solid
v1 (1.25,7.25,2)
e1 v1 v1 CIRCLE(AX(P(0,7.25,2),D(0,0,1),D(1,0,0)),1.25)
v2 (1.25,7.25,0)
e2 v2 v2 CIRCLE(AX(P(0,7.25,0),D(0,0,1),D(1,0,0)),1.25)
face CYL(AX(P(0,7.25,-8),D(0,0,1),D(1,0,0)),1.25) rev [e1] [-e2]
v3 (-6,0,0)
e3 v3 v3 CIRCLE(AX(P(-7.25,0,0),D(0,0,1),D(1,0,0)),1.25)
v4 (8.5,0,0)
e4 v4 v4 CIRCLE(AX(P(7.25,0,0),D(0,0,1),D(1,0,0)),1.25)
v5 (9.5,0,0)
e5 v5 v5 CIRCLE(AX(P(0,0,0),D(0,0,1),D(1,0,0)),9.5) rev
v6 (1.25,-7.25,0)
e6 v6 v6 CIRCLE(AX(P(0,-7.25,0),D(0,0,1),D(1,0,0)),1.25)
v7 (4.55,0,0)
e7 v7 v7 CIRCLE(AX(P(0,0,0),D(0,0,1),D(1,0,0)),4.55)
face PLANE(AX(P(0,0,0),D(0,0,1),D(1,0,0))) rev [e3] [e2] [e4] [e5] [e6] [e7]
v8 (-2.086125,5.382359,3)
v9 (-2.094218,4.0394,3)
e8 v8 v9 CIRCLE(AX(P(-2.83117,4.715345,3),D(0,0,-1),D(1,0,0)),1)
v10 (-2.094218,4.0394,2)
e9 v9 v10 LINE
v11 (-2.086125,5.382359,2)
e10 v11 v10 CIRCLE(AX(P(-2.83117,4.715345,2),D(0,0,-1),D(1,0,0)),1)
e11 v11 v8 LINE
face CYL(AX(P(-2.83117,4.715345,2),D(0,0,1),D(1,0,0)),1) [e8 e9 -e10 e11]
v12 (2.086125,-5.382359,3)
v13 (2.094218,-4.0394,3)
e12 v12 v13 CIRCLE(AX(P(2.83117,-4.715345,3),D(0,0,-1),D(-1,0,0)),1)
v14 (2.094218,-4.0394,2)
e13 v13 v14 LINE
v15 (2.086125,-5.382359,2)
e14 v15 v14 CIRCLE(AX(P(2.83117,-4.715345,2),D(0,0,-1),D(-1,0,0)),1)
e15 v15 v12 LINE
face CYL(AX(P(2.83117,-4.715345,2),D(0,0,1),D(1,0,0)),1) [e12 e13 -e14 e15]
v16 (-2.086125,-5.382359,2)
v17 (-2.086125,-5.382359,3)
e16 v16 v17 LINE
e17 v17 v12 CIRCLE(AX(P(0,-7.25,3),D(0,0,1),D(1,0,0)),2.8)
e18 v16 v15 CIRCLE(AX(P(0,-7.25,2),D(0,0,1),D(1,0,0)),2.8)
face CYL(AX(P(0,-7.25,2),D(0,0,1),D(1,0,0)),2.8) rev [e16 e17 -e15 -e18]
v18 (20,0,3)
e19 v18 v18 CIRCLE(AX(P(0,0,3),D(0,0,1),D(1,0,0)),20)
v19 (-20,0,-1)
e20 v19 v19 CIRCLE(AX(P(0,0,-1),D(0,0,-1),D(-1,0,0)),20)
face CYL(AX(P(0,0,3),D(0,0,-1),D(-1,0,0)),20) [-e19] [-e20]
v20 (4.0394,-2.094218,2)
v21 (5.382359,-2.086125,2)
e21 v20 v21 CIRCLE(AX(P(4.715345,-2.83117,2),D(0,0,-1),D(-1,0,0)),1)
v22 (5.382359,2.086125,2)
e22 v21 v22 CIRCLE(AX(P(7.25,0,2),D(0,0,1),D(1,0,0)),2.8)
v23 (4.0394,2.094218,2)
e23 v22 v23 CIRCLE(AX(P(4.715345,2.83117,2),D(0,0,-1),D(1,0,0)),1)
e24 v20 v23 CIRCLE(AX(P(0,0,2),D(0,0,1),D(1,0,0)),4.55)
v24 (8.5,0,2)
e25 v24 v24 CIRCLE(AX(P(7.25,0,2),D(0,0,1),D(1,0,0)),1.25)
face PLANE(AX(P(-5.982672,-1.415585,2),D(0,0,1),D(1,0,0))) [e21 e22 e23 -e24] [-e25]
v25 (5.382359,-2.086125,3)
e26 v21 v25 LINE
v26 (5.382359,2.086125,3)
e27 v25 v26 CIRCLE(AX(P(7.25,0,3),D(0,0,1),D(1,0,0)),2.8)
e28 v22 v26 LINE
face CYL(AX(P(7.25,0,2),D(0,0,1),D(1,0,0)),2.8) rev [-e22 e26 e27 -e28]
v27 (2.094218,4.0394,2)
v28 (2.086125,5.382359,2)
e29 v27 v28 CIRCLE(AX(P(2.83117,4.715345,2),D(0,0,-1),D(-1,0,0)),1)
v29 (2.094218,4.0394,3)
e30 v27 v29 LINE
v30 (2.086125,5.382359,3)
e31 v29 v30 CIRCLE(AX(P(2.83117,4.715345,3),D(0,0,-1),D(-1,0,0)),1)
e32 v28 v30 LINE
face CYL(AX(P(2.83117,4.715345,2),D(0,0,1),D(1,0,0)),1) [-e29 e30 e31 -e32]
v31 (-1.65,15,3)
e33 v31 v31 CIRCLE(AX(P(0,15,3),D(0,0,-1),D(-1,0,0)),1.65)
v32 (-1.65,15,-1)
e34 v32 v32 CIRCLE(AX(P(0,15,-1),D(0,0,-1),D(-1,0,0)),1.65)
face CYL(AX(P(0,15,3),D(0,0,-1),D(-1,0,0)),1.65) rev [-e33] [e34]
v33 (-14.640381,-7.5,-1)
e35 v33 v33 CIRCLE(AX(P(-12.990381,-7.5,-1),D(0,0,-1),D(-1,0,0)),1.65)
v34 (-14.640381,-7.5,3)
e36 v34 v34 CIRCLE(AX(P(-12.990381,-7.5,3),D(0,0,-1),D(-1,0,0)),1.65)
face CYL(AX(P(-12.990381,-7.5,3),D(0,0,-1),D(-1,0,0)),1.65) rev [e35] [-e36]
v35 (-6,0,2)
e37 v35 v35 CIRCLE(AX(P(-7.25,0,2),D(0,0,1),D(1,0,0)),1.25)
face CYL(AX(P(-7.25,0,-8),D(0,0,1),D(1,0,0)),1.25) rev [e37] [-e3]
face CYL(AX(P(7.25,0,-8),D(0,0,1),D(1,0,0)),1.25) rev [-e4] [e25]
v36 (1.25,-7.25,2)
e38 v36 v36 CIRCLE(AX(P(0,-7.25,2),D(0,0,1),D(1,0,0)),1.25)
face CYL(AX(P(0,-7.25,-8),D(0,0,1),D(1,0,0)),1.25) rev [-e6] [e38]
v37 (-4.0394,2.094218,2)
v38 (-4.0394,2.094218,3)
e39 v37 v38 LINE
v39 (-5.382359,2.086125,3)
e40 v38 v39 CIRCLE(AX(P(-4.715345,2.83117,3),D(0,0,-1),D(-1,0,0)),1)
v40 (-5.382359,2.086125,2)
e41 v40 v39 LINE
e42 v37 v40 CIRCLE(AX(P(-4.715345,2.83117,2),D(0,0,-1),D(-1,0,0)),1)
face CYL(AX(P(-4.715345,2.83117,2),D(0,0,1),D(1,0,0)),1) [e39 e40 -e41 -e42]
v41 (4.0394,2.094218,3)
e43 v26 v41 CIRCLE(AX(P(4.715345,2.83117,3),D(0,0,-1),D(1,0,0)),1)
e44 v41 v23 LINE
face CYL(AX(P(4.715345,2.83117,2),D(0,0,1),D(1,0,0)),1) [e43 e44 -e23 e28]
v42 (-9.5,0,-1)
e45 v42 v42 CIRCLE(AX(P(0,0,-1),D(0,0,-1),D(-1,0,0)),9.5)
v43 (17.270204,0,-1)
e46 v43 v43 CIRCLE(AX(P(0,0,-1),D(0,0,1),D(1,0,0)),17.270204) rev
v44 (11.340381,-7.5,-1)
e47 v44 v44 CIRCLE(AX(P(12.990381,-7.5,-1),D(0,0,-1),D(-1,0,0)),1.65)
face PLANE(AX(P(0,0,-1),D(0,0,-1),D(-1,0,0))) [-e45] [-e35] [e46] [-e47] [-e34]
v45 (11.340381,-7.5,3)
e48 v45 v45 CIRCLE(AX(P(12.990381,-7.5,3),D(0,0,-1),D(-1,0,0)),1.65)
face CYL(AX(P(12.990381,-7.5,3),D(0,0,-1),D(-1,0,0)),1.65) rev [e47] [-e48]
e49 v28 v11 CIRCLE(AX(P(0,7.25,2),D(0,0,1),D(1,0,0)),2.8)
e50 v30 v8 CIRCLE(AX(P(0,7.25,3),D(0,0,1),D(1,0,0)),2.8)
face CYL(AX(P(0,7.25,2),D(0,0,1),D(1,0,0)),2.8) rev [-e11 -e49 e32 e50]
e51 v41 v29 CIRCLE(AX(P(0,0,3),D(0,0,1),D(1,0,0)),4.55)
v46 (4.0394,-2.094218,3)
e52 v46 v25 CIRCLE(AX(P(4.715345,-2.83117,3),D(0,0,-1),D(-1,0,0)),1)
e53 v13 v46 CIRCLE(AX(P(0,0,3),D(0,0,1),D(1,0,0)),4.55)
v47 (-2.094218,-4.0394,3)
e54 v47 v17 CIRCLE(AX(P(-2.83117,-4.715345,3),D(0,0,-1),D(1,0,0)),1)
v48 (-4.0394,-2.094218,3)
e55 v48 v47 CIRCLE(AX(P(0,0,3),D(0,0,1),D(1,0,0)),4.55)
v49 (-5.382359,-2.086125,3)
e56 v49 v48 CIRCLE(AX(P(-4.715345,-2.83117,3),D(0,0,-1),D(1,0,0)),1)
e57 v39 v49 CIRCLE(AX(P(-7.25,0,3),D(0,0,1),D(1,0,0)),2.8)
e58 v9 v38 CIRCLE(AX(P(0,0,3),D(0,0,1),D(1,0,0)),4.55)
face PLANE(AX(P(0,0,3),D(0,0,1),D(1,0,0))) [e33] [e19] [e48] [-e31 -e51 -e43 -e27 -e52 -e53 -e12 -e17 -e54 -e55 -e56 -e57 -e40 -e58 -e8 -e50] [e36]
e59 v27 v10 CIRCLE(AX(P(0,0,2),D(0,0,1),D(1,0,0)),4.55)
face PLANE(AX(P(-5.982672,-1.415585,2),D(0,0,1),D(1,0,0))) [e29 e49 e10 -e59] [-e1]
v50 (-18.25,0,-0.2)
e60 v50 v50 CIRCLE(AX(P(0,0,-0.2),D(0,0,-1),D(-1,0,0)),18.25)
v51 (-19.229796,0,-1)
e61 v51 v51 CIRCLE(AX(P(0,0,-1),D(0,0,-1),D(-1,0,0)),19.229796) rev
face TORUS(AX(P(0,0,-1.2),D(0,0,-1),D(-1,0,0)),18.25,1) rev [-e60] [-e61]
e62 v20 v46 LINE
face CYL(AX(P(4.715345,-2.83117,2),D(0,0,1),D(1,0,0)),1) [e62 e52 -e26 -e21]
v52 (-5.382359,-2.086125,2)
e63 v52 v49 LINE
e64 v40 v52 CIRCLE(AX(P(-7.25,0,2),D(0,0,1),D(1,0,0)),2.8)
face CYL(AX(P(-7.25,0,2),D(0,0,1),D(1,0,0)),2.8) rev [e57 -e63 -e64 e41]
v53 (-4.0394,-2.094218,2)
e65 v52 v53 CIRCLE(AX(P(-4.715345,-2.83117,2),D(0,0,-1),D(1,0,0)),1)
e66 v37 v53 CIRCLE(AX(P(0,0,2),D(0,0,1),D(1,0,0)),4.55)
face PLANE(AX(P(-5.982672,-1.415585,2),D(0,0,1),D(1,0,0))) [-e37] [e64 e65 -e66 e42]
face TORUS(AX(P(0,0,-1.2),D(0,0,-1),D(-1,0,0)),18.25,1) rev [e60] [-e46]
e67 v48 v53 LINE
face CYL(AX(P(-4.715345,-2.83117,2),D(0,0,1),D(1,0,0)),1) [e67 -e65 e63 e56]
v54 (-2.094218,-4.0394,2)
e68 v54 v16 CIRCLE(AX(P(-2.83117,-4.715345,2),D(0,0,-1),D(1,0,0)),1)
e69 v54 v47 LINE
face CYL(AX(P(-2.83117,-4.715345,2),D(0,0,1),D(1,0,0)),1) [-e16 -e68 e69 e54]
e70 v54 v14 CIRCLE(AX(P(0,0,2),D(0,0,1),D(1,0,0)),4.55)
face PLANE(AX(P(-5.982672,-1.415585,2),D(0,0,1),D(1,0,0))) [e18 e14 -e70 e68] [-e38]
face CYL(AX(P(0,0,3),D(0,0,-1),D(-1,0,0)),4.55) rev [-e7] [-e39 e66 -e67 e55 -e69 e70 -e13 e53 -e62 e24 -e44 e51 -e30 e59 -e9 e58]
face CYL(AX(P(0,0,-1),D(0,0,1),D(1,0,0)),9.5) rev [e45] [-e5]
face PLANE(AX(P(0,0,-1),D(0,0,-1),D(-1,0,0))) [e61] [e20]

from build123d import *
from build123d.topology import SkipClean

# Parameters (mm, degrees)
SKETCH_1_R          = 20
SKETCH_1_R_2        = 4.55
EXTRUDE_1_DEPTH     = 3
SKETCH_4_R          = 1.25
CUT_EXTRUDE_3_DEPTH = 11
SKETCH_5_R          = 1.25
CUT_EXTRUDE_4_DEPTH = 1
SKETCH_7_R          = 20
SKETCH_7_R_2        = 9.5
EXTRUDE_2_DEPTH     = 1
EXTRUDE_START       = 0.2
SKETCH_9_R          = 20
SKETCH_9_R_2        = 9.5
EXTRUDE_3_DEPTH     = 0.2
SKETCH_10_R         = 19.25
SKETCH_10_R_2       = 17.25
CUT_EXTRUDE_6_DEPTH = 1
FILLET_1_R          = 1
SKETCH_11_R         = 20
CUT_EXTRUDE_7_DEPTH = 0.2
SKETCH_13_R         = 1.65
CUT_EXTRUDE_8_DEPTH = 29.565713714


with BuildPart() as part:
    # 草图1 → 凸台-拉伸1 (new body)
    with BuildSketch(Plane.XY):
        Circle(SKETCH_1_R)
        Circle(SKETCH_1_R_2, mode=Mode.SUBTRACT)
    extrude(amount=EXTRUDE_1_DEPTH)

    # 草图4 → 切除-拉伸3 (cut)
    with BuildSketch(Plane.XY.offset(3)):
        with Locations((0, 7.25)):
            Circle(SKETCH_4_R)
        with Locations((7.25, 0)):
            Circle(SKETCH_4_R)
        with Locations((0, -7.25)):
            Circle(SKETCH_4_R)
        with Locations((-7.25, 0)):
            Circle(SKETCH_4_R)
    extrude(amount=-CUT_EXTRUDE_3_DEPTH, mode=Mode.SUBTRACT)

    # 草图5 → 切除-拉伸4 (cut)
    with BuildSketch(Plane.XY.offset(3)):
        with BuildLine():
            ThreePointArc((-5.382359347, 2.08612521), (-10.05, 0), (-5.382359347, -2.08612521))
            ThreePointArc((-5.382359347, -2.08612521), (-4.565967837, -1.842389611), (-3.858009404, -2.316411759))
            ThreePointArc((-3.858009404, -2.316411759), (-3.181980515, -3.181980515), (-2.316411759, -3.858009404))
            ThreePointArc((-2.316411759, -3.858009404), (-1.842389611, -4.565967837), (-2.08612521, -5.382359347))
            ThreePointArc((-2.08612521, -5.382359347), (0, -10.05), (2.08612521, -5.382359347))
            ThreePointArc((2.08612521, -5.382359347), (1.842389611, -4.565967837), (2.316411759, -3.858009404))
            ThreePointArc((2.316411759, -3.858009404), (3.181980515, -3.181980515), (3.858009404, -2.316411759))
            ThreePointArc((3.858009404, -2.316411759), (4.565967837, -1.842389611), (5.382359347, -2.08612521))
            ThreePointArc((5.382359347, -2.08612521), (10.05, 0), (5.382359347, 2.08612521))
            ThreePointArc((5.382359347, 2.08612521), (4.565967837, 1.842389611), (3.858009404, 2.316411759))
            ThreePointArc((3.858009404, 2.316411759), (3.181980515, 3.181980515), (2.316411759, 3.858009404))
            ThreePointArc((2.316411759, 3.858009404), (1.842389611, 4.565967837), (2.08612521, 5.382359347))
            ThreePointArc((2.08612521, 5.382359347), (0, 10.05), (-2.08612521, 5.382359347))
            ThreePointArc((-2.08612521, 5.382359347), (-1.842389611, 4.565967837), (-2.316411759, 3.858009404))
            ThreePointArc((-2.316411759, 3.858009404), (-3.181980515, 3.181980515), (-3.858009404, 2.316411759))
            ThreePointArc((-3.858009404, 2.316411759), (-4.565967837, 1.842389611), (-5.382359347, 2.08612521))
        make_face()
        with Locations((0, -7.25)):
            Circle(SKETCH_5_R, mode=Mode.SUBTRACT)
        with Locations((-7.25, 0)):
            Circle(SKETCH_5_R, mode=Mode.SUBTRACT)
        with Locations((7.25, 0)):
            Circle(SKETCH_5_R, mode=Mode.SUBTRACT)
        with Locations((0, 7.25)):
            Circle(SKETCH_5_R, mode=Mode.SUBTRACT)
    extrude(amount=-CUT_EXTRUDE_4_DEPTH, mode=Mode.SUBTRACT)

    # 草图7 → 凸台-拉伸2 (add, symmetric)
    with SkipClean():  # the faces are left unmerged after this step: merging them gives an invalid solid
        with BuildSketch(Plane(origin=(0, 0, 0), x_dir=(-1, 0, 0), z_dir=(0, 0, -1))):
            Circle(SKETCH_7_R)
            with Locations(Location((0, 0, 0), (0, 0, 180))):
                Circle(SKETCH_7_R_2, mode=Mode.SUBTRACT)
        extrude(amount=EXTRUDE_2_DEPTH, both=True)

    # 草图9 → 凸台-拉伸3 (add)
    with BuildSketch(Plane(origin=(0, 0, -1), x_dir=(-1, 0, 0), z_dir=(0, 0, -1)).offset(EXTRUDE_START)):
        Circle(SKETCH_9_R)
        with Locations(Location((0, 0, 0), (0, 0, 180))):
            Circle(SKETCH_9_R_2, mode=Mode.SUBTRACT)
    extrude(amount=-EXTRUDE_3_DEPTH)

    # 草图10 → 切除-拉伸6 (cut)
    with BuildSketch(Plane(origin=(0, 0, -1.2), x_dir=(-1, 0, 0), z_dir=(0, 0, -1))):
        Circle(SKETCH_10_R)
        Circle(SKETCH_10_R_2, mode=Mode.SUBTRACT)
    extrude(amount=-CUT_EXTRUDE_6_DEPTH, mode=Mode.SUBTRACT)

    # 圆角1
    fillet_1_edges = [part.edges().sort_by_distance(p)[0] for p in [
        (19.25, 0, -0.2),
        (17.25, 0, -0.2),
    ]]
    fillet(fillet_1_edges, radius=FILLET_1_R - 0.0001)  # a hair under: the kernel refuses the full size

    # 草图11 → 切除-拉伸7 (cut)
    with BuildSketch(Plane(origin=(0, 0, -1.2), x_dir=(-1, 0, 0), z_dir=(0, 0, -1))):
        Circle(SKETCH_11_R)
    extrude(amount=-CUT_EXTRUDE_7_DEPTH, mode=Mode.SUBTRACT)

    # 草图13 → 切除-拉伸8 (cut, through all)
    with BuildSketch(Plane(origin=(0, 0, -1), x_dir=(-1, 0, 0), z_dir=(0, 0, -1))):
        with Locations((0, 15)):
            Circle(SKETCH_13_R)
        with Locations((12.990381057, -7.5)):
            Circle(SKETCH_13_R)
        with Locations((-12.990381057, -7.5)):
            Circle(SKETCH_13_R)
    extrude(amount=-CUT_EXTRUDE_8_DEPTH, mode=Mode.SUBTRACT)


solid = part.part
